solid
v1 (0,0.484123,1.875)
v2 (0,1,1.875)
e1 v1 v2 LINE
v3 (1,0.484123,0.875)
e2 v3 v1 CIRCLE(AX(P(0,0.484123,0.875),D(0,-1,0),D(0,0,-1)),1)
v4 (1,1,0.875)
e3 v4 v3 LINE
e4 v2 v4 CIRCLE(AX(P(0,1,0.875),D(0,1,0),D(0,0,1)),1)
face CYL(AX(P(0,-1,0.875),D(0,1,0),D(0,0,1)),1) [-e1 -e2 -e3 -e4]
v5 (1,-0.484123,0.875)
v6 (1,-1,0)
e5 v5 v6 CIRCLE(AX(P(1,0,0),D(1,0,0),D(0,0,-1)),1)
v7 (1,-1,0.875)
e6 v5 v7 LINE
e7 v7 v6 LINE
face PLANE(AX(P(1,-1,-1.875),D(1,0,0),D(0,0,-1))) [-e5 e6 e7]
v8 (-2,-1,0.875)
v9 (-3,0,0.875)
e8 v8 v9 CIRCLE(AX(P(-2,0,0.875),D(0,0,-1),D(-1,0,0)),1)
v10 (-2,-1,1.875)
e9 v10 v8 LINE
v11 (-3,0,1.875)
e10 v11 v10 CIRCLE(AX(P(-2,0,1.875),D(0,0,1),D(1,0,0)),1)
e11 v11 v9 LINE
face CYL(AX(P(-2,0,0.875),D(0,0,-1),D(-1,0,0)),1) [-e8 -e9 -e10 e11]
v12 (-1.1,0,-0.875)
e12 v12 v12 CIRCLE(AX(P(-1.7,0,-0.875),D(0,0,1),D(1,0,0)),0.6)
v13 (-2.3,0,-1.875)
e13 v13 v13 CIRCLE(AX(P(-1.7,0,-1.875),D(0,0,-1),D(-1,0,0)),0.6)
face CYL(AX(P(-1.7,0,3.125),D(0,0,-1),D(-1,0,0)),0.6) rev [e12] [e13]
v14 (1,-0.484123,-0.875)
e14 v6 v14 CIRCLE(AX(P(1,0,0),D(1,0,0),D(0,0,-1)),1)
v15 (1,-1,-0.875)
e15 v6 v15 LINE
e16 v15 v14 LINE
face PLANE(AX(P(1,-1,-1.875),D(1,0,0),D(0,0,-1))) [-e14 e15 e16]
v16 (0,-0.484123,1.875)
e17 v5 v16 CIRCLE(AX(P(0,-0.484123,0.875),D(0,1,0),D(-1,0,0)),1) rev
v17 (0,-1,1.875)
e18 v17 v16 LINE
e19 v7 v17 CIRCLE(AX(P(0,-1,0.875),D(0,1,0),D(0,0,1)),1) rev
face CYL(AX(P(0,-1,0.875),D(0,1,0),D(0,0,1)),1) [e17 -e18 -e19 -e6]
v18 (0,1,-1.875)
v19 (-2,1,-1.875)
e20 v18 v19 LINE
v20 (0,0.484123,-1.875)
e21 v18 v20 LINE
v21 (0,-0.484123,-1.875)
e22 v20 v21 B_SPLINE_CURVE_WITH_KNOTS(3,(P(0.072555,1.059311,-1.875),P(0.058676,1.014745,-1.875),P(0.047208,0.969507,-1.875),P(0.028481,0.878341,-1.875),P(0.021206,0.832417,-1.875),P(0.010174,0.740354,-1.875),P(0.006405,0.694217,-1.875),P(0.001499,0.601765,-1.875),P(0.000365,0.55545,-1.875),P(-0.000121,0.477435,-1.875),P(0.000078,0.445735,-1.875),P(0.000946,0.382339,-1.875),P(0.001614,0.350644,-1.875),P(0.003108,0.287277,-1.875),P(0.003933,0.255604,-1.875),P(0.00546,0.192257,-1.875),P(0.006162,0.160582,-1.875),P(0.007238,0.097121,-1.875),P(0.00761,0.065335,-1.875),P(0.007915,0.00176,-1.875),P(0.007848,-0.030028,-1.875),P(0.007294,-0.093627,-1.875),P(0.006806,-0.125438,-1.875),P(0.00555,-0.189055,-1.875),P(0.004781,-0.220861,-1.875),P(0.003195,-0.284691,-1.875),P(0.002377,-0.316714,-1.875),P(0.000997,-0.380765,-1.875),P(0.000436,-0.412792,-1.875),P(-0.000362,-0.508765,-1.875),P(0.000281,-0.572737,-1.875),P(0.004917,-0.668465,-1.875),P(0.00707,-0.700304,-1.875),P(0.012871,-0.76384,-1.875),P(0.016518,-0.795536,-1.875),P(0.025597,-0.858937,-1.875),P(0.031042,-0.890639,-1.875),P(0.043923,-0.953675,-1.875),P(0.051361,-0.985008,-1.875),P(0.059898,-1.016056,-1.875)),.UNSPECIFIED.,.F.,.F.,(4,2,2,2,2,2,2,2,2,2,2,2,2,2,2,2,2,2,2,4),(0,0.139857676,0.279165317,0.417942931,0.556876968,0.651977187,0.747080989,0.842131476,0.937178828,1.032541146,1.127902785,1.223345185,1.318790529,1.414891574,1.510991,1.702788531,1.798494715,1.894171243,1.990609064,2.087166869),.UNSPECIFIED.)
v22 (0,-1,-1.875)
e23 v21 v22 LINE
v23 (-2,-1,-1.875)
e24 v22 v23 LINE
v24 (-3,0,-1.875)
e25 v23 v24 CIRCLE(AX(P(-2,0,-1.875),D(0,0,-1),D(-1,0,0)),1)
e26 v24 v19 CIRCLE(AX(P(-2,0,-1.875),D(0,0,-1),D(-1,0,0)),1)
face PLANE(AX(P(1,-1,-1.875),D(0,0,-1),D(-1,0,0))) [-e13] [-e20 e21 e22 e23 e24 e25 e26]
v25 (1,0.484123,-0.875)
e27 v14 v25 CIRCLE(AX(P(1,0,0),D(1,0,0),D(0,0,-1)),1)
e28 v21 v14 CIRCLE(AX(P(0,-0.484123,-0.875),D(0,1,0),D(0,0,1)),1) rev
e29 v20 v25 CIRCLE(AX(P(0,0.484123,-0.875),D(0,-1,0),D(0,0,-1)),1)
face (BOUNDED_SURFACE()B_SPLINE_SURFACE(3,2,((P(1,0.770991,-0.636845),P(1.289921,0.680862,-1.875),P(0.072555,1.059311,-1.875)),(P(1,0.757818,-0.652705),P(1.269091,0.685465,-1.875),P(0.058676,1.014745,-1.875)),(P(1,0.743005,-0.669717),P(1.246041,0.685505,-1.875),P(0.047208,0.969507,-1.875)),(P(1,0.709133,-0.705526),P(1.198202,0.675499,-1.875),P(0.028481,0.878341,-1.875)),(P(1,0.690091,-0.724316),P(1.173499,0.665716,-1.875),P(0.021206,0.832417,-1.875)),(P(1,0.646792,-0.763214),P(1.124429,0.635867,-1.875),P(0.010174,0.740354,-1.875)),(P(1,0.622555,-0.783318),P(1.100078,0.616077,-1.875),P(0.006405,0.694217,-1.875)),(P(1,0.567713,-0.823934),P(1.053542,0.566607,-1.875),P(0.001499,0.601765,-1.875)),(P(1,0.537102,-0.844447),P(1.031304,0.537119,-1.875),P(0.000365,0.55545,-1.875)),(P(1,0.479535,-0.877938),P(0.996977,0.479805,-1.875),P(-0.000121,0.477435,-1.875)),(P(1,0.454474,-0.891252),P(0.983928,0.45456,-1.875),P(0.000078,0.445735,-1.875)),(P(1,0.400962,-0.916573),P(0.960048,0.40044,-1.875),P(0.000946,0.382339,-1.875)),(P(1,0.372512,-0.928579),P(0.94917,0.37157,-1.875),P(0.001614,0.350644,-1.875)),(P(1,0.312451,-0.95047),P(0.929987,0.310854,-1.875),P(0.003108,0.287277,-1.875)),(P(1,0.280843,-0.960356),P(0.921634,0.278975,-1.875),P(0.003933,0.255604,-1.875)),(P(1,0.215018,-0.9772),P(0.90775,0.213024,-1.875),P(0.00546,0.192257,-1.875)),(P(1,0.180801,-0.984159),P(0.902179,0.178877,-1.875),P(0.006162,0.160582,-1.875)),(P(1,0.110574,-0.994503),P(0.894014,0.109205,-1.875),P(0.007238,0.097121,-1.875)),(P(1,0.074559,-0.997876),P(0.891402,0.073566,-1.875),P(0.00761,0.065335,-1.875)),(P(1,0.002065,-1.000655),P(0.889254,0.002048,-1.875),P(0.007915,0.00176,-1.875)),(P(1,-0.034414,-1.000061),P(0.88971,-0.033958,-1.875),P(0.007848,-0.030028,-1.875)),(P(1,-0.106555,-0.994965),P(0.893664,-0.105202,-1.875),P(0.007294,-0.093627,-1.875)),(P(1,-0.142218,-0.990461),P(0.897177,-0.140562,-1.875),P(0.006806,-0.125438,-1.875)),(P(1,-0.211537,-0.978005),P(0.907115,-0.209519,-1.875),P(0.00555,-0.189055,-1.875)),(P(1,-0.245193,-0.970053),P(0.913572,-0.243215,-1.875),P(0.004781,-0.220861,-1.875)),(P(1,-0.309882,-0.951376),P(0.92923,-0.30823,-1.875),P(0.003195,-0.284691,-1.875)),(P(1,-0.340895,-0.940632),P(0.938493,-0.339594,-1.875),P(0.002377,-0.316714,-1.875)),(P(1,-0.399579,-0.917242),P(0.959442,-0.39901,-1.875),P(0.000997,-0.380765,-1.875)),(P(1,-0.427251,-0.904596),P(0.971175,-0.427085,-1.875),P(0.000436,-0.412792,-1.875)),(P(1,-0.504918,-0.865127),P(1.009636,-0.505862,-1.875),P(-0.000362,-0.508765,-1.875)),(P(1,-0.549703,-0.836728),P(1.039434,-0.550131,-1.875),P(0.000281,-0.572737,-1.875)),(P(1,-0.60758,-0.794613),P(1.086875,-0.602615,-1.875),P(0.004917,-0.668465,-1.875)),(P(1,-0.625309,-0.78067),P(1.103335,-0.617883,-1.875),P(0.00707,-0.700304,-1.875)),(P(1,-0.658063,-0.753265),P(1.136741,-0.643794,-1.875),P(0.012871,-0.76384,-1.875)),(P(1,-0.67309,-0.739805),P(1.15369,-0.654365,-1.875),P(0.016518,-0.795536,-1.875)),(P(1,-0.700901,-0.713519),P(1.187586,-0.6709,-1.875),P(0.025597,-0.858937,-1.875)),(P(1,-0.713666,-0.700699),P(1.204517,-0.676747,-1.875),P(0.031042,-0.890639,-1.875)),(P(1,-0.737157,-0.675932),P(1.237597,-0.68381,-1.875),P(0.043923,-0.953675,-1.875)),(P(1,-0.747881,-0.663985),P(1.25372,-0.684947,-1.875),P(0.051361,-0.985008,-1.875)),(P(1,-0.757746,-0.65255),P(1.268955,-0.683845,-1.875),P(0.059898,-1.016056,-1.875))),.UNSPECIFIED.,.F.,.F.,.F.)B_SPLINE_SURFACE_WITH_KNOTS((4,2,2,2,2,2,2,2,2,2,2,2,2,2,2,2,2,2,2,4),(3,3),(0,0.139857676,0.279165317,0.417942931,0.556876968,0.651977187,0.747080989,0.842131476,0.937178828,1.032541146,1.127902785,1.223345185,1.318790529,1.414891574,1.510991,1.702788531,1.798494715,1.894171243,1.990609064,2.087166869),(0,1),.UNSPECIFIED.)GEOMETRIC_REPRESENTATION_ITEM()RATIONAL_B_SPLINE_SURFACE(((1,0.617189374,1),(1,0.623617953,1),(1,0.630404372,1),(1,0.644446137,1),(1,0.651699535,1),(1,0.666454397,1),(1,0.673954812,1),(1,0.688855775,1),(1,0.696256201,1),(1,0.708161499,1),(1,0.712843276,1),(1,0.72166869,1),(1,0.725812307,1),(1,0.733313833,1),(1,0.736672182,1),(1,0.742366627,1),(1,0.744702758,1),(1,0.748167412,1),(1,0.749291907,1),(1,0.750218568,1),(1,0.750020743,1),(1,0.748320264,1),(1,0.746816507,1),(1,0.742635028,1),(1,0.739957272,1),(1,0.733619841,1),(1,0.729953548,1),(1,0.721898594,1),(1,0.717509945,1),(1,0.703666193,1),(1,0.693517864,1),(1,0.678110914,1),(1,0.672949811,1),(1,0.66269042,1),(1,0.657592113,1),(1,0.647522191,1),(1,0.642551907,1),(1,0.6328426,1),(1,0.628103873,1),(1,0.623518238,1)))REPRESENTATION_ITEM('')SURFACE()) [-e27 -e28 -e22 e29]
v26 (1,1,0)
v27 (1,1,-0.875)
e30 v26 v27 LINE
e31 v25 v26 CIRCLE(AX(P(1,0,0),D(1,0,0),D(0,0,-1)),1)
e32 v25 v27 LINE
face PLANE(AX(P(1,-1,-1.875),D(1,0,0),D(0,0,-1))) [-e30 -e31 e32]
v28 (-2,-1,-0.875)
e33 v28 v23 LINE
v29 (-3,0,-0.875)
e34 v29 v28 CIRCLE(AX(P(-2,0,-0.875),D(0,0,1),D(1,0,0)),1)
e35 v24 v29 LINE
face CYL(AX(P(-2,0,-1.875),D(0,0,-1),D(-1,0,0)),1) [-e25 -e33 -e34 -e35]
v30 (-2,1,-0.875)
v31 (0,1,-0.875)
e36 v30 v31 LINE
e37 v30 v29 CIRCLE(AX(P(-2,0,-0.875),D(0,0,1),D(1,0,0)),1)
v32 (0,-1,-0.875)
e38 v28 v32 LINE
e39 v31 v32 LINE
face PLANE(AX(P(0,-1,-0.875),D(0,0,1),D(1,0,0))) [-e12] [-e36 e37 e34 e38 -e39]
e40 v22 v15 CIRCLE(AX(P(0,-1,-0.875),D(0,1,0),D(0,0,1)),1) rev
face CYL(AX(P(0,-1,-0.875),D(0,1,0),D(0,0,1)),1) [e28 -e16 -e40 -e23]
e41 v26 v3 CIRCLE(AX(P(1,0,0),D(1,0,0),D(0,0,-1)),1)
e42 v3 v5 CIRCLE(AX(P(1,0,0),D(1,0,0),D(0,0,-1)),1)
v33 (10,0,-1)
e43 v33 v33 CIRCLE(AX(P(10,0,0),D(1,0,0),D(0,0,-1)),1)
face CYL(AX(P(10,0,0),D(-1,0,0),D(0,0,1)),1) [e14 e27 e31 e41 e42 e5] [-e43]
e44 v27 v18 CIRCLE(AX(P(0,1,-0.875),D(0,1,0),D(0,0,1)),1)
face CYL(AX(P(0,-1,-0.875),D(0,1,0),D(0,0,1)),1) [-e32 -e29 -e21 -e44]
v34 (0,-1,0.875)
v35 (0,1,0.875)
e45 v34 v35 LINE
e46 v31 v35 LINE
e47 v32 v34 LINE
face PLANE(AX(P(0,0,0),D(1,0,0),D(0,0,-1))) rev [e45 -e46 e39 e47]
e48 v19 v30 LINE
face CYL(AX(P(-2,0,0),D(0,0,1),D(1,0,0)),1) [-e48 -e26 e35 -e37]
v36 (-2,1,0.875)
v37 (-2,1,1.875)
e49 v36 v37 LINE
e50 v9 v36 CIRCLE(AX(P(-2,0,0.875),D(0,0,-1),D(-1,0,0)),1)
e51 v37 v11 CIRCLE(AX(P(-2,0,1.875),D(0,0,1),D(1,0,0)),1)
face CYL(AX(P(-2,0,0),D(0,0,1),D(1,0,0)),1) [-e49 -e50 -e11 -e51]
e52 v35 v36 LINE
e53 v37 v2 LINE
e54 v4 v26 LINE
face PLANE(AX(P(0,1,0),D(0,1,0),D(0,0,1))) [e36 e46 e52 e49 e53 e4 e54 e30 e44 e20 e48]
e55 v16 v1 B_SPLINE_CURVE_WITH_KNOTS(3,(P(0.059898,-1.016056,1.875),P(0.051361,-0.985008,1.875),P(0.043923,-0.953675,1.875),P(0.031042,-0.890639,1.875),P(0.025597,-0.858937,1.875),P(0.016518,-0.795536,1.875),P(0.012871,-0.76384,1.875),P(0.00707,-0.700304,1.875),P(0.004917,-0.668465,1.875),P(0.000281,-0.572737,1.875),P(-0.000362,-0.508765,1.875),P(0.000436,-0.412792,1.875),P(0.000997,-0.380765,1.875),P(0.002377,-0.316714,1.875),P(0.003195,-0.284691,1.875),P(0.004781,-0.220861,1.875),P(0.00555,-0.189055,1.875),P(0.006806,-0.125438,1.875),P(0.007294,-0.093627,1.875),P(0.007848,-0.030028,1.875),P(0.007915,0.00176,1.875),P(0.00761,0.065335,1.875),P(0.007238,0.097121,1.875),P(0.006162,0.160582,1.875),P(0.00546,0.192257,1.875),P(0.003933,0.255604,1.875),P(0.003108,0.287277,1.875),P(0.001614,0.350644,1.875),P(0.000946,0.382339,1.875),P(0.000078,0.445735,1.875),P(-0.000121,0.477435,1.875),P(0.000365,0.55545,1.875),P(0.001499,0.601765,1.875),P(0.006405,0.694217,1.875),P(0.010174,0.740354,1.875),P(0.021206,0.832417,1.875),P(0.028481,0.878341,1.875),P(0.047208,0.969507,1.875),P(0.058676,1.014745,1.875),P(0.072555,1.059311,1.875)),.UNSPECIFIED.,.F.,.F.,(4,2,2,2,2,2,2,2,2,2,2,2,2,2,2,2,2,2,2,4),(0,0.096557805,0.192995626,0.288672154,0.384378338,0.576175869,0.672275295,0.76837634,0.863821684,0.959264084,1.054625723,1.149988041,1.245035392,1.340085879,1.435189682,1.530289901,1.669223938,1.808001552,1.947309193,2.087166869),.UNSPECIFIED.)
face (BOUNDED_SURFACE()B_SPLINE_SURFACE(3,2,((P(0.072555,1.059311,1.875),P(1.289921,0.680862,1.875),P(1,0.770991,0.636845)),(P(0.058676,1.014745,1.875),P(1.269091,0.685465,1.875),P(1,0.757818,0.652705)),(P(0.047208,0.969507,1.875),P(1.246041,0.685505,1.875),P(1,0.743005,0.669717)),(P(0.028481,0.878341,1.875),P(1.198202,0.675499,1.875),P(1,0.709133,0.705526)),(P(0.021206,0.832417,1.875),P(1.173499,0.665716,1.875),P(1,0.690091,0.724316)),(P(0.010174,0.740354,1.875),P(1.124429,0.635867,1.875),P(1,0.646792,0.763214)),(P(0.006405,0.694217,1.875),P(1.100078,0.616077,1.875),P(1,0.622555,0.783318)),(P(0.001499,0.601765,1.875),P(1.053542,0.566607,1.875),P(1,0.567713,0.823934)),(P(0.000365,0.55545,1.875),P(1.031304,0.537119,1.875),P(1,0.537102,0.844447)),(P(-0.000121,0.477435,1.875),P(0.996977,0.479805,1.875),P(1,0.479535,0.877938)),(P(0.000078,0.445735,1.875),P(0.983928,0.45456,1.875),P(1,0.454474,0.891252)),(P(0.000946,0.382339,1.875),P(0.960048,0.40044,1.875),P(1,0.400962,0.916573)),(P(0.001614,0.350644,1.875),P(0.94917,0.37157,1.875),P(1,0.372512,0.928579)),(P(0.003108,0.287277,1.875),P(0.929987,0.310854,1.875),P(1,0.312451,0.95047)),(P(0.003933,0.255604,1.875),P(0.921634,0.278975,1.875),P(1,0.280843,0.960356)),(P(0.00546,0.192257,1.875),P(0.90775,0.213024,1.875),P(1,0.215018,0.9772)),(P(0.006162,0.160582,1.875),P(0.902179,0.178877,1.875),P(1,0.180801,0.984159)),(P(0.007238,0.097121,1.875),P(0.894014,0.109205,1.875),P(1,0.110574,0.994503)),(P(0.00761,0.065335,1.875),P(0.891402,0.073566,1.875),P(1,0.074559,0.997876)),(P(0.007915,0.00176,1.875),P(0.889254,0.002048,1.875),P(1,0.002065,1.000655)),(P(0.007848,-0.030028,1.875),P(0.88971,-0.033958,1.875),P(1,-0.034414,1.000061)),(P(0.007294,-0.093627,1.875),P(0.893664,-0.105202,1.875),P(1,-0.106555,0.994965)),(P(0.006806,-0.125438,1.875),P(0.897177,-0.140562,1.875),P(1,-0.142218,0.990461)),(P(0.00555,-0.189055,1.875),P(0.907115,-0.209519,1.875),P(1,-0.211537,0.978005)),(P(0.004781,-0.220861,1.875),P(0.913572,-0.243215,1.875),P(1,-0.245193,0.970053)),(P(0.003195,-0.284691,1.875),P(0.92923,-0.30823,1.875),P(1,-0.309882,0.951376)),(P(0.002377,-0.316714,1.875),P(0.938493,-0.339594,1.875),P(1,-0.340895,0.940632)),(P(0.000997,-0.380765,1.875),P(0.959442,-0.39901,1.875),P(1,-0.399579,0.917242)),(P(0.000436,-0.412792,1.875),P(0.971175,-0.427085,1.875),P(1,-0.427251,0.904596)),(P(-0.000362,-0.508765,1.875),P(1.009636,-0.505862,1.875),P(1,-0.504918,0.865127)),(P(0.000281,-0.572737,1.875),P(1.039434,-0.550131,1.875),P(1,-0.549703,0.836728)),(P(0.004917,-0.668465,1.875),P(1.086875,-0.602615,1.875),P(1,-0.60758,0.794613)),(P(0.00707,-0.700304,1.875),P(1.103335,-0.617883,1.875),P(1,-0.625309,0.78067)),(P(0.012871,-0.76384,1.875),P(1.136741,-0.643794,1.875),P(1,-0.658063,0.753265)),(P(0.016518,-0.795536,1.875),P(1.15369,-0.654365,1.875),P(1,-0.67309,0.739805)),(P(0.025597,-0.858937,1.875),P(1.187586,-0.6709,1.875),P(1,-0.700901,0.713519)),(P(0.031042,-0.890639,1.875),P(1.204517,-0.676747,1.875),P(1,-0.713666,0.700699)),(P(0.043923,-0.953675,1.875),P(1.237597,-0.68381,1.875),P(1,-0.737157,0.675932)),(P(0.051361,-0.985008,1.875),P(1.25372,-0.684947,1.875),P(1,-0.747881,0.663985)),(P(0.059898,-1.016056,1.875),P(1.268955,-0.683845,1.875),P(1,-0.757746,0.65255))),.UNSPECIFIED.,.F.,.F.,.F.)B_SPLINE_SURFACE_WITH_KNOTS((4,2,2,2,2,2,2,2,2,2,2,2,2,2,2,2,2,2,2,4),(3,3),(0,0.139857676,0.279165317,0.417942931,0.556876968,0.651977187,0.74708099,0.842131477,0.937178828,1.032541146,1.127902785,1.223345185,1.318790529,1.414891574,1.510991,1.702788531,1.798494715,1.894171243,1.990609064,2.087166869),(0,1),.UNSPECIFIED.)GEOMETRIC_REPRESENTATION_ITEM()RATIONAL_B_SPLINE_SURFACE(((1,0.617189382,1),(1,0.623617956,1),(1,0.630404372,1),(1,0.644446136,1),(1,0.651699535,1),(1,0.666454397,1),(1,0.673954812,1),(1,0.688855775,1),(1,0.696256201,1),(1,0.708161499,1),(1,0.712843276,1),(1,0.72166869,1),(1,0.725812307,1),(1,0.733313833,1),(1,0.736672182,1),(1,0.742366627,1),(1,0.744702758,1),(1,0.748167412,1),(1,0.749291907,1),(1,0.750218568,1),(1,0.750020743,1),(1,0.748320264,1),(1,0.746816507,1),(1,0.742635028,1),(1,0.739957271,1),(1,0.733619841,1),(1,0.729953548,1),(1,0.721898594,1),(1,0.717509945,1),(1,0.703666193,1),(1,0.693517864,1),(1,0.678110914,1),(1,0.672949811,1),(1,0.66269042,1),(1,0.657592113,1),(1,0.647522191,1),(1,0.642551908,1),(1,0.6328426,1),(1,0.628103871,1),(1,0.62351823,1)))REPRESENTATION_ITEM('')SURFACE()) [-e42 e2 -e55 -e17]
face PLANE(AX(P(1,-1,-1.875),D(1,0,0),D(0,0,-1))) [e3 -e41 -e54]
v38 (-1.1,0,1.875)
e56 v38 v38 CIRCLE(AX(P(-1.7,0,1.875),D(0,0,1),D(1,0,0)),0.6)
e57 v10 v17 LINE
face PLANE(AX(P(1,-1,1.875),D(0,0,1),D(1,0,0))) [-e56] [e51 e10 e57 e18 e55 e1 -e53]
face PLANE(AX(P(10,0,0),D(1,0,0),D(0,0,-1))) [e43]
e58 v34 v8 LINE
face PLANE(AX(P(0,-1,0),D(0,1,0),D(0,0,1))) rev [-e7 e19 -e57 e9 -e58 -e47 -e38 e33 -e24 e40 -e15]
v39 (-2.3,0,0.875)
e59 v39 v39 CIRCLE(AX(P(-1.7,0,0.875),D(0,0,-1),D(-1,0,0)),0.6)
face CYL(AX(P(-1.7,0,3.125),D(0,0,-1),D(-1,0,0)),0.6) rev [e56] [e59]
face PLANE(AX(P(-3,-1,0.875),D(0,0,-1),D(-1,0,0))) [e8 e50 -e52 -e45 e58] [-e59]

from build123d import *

# Parameters (mm, degrees)
SKETCH1_R                = 1
BOSS_EXTRUDE1_DEPTH      = 10
BOSS_EXTRUDE2_DEPTH      = 1
BOSS_EXTRUDE2_DEPTH_BACK = 1
FILLET1_R                = 1
SKETCH3_R                = 0.6
CUT_EXTRUDE1_DEPTH       = 5


with BuildPart() as part:
    # Sketch1 → Boss-Extrude1 (new body)
    with BuildSketch(Plane(origin=(0, 0, 0), x_dir=(0, 0, -1), z_dir=(1, 0, 0))):
        Circle(SKETCH1_R)
    extrude(amount=BOSS_EXTRUDE1_DEPTH)

    # Sketch2 → Boss-Extrude2 (add, two sides: drawn at the far end of the back side and taken through both)
    with BuildSketch(Plane(origin=(0, 0, 0), x_dir=(1, 0, 0), z_dir=(0, 1, 0)).offset(-BOSS_EXTRUDE2_DEPTH_BACK)):
        Polygon((1, 1.875), (1, -1.875), (-3, -1.875), (-3, -0.875), (0, -0.875), (0, 0.875), (-3, 0.875), (-3, 1.875), align=None)
    extrude(amount=BOSS_EXTRUDE2_DEPTH + BOSS_EXTRUDE2_DEPTH_BACK)

    # Fillet1
    fillet1_edges = [part.edges().sort_by_distance(p)[0] for p in [
        (-3, 1, -1.375),
        (-3, -1, -1.375),
        (-3, -1, 1.375),
        (-3, 1, 1.375),
        (1, 0, -1.875),
        (1, 0, 1.875),
    ]]
    fillet(fillet1_edges, radius=FILLET1_R - 0.0001)  # a hair under: the kernel refuses the full size

    # Sketch3 → Cut-Extrude1 (cut)
    with BuildSketch(Plane(origin=(0, 0, -1.875), x_dir=(-1, 0, 0), z_dir=(0, 0, -1))):
        with Locations((1.7, 0)):
            Circle(SKETCH3_R)
    extrude(amount=-CUT_EXTRUDE1_DEPTH, mode=Mode.SUBTRACT)


solid = part.part
